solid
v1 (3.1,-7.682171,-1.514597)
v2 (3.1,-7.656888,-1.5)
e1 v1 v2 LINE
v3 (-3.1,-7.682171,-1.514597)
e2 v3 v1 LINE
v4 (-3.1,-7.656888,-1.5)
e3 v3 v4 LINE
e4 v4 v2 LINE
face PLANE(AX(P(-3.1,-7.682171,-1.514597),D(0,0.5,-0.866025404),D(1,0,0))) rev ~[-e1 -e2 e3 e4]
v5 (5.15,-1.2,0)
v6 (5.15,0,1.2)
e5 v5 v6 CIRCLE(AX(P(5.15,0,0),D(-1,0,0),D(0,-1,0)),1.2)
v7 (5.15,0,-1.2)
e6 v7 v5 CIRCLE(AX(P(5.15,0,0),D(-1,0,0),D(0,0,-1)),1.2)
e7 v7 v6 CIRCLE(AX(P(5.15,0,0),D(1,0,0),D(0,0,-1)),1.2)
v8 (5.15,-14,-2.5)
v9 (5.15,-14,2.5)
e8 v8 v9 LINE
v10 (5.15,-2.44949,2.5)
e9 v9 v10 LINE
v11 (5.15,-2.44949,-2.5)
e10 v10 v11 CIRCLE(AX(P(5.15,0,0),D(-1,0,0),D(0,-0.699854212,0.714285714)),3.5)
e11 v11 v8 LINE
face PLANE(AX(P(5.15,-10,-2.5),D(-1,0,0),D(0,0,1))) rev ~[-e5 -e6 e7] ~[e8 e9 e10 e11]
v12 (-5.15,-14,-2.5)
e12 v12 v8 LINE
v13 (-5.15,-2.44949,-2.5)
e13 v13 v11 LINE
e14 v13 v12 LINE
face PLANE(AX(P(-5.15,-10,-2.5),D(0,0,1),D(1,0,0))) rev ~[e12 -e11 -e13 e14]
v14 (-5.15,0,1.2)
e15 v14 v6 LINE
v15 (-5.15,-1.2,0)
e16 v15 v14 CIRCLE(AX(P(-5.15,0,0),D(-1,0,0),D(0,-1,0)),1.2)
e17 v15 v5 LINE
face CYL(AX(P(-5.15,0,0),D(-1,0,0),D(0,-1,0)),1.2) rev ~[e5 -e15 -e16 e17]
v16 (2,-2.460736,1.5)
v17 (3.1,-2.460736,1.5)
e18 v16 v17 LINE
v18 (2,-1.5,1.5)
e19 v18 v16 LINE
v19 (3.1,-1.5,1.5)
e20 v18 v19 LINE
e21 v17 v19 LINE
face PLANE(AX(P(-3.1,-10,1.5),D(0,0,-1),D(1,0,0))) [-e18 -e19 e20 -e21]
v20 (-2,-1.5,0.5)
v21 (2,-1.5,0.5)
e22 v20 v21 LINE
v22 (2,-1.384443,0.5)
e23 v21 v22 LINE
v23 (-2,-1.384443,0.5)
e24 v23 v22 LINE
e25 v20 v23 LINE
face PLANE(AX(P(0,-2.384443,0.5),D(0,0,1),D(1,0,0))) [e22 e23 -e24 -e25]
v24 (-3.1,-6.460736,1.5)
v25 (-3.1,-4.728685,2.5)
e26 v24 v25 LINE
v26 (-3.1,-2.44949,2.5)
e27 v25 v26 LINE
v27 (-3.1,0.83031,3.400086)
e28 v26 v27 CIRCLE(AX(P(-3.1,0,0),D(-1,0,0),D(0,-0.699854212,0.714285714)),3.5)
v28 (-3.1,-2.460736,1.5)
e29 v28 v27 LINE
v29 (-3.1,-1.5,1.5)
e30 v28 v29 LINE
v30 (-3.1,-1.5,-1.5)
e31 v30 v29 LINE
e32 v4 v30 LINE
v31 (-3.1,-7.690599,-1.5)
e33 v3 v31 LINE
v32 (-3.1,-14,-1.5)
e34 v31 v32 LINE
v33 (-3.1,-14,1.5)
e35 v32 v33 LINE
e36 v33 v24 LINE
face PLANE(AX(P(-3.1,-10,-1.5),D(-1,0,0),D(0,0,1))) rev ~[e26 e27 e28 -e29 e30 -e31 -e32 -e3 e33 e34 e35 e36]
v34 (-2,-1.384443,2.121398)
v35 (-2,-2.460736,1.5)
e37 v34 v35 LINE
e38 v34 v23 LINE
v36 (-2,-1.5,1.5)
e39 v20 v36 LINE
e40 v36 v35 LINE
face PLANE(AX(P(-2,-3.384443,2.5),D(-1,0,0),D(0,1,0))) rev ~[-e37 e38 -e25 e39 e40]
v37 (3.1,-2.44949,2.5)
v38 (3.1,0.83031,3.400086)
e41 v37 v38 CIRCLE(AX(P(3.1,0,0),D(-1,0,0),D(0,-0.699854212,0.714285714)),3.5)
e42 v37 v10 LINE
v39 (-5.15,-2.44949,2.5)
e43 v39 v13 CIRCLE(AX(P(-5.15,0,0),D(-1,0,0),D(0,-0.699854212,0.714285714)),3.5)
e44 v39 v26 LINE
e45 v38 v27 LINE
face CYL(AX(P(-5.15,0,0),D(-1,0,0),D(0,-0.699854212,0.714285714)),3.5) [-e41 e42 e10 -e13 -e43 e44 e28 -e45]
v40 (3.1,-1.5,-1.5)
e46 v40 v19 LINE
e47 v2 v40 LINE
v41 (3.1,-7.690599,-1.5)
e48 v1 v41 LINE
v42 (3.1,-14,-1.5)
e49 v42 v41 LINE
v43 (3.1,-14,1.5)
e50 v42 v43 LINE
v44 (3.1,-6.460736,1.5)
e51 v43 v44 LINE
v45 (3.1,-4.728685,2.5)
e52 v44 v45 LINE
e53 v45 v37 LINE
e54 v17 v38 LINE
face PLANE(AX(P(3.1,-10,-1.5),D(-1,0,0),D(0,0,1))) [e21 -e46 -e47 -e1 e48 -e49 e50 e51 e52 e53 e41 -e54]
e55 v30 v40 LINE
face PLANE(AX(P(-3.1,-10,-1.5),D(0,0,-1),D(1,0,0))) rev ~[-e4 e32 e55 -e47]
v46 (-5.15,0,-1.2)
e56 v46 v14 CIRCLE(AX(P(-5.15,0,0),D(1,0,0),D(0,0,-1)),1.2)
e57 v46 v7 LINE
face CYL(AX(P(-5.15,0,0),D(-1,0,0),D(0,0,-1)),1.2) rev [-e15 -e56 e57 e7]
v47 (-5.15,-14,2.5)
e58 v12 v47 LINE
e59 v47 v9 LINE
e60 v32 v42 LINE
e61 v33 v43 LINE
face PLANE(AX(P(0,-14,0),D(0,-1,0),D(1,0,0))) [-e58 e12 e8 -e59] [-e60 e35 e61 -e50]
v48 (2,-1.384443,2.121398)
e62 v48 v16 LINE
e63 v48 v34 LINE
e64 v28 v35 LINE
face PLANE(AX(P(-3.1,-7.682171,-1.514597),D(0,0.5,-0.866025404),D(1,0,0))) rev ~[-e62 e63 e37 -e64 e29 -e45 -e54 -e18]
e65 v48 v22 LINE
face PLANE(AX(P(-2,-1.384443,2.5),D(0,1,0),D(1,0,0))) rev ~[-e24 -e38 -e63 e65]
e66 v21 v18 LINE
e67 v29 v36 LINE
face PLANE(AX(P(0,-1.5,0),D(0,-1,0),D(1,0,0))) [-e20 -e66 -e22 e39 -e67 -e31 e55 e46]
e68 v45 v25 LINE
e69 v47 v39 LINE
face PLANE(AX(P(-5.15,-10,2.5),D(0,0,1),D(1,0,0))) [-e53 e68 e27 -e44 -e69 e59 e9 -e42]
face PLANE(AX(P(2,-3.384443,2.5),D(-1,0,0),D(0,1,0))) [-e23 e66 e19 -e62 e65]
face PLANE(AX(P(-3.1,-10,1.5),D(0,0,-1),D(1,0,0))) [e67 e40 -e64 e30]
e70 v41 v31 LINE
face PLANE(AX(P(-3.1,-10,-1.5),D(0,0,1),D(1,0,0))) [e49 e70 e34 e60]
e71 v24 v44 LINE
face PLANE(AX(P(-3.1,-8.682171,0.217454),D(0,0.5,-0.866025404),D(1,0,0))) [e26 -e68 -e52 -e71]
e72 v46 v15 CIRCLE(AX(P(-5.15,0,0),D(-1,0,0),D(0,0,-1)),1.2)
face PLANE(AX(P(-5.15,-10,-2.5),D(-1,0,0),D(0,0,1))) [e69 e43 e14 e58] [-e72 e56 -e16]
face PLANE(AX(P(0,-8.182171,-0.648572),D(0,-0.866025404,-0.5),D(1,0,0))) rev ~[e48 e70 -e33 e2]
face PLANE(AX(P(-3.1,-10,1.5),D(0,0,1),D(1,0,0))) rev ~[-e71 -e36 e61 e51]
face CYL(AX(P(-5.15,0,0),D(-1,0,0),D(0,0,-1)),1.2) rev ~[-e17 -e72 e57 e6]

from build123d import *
from build123d import SkipClean  # not in build123d's __all__

# Parameters (mm, degrees)
F0_W          = 10.3
F0_H          = 5
F1_DEPTH      = 10
F3_DEPTH      = 10.3
F4_DEPTH      = 11
F5_W          = 4
F5_H          = 2
F6_DEPTH      = 2
F6_DEPTH_BACK = 5
F7_W          = 6.2
F7_H          = 3
F8_DEPTH      = 8.5
F10_W         = 6.2
F10_H         = 2
F11_DEPTH     = 25
F7_W_2        = 10.3
F7_H_2        = 5
F12_DEPTH     = 4


with BuildPart() as f1:
    # F0 (on Front) → F1 (new body)
    with BuildSketch(Plane.XZ):
        Rectangle(F0_W, F0_H)
    extrude(amount=F1_DEPTH)

    # F2 (on face) → F3 (join)
    with BuildSketch(Plane(origin=(-5.15, 0, 0), x_dir=(0, -1, 0), z_dir=(-1, 0, 0))):
        with BuildLine():
            ThreePointArc((0, -1.2), (-1.2, 0), (0, 1.2))
            Line((0, 1.2), (0, 2.5))
            Line((0, 2.5), (2.4494897428, 2.5))
            ThreePointArc((2.4494897428, 2.5), (-3.5, 0), (2.4494897428, -2.5))
            Line((2.4494897428, -2.5), (0, -2.5))
            Line((0, -2.5), (0, -1.2))
        make_face()
    extrude(amount=-F3_DEPTH)

    # F2 (on face) → F4 (cut)
    with BuildSketch(Plane(origin=(-5.15, 0, 0), x_dir=(0, -1, 0), z_dir=(-1, 0, 0))):
        with BuildLine():
            ThreePointArc((0, -1.2), (0.8485281374, -0.8485281374), (1.2, 0))
            ThreePointArc((1.2, 0), (0.8485281374, 0.8485281374), (0, 1.2))
            Line((0, 1.2), (0, -1.2))
        make_face()
    with SkipClean():  # cleaning this boolean's faces spoils the solid; the shape is the same uncleaned
        extrude(amount=-F4_DEPTH, mode=Mode.SUBTRACT)

    # F5 (on face) → F6 (cut, two sides)
    with BuildSketch(Plane.XY.offset(2.5)) as f6_sk:
        with Locations((0, -2.3844429548)):
            Rectangle(F5_W, F5_H)
    extrude(amount=-F6_DEPTH, mode=Mode.SUBTRACT)
    extrude(f6_sk.sketch, amount=F6_DEPTH_BACK, mode=Mode.SUBTRACT)

    # F7 (on face) → F8 (cut)
    with BuildSketch(Plane.XZ.offset(10)):
        Rectangle(F7_W, F7_H)
    extrude(amount=-F8_DEPTH, mode=Mode.SUBTRACT)

    # F10 (on face) → F11 (cut)
    with BuildSketch(Plane(origin=(0, -6.4174682453, -3.7051270189), x_dir=(1, 0, 0), z_dir=(0, -0.8660254038, -0.5))):
        with Locations((0, 3.5294059198)):
            Rectangle(F10_W, F10_H)
    extrude(amount=-F11_DEPTH, mode=Mode.SUBTRACT)

    # F7 (on face) → F12 (join)
    with BuildSketch(Plane.XZ.offset(10)):
        Rectangle(F7_W_2, F7_H_2)
        Rectangle(F7_W, F7_H, mode=Mode.SUBTRACT)
    extrude(amount=F12_DEPTH)


solid = f1.part
